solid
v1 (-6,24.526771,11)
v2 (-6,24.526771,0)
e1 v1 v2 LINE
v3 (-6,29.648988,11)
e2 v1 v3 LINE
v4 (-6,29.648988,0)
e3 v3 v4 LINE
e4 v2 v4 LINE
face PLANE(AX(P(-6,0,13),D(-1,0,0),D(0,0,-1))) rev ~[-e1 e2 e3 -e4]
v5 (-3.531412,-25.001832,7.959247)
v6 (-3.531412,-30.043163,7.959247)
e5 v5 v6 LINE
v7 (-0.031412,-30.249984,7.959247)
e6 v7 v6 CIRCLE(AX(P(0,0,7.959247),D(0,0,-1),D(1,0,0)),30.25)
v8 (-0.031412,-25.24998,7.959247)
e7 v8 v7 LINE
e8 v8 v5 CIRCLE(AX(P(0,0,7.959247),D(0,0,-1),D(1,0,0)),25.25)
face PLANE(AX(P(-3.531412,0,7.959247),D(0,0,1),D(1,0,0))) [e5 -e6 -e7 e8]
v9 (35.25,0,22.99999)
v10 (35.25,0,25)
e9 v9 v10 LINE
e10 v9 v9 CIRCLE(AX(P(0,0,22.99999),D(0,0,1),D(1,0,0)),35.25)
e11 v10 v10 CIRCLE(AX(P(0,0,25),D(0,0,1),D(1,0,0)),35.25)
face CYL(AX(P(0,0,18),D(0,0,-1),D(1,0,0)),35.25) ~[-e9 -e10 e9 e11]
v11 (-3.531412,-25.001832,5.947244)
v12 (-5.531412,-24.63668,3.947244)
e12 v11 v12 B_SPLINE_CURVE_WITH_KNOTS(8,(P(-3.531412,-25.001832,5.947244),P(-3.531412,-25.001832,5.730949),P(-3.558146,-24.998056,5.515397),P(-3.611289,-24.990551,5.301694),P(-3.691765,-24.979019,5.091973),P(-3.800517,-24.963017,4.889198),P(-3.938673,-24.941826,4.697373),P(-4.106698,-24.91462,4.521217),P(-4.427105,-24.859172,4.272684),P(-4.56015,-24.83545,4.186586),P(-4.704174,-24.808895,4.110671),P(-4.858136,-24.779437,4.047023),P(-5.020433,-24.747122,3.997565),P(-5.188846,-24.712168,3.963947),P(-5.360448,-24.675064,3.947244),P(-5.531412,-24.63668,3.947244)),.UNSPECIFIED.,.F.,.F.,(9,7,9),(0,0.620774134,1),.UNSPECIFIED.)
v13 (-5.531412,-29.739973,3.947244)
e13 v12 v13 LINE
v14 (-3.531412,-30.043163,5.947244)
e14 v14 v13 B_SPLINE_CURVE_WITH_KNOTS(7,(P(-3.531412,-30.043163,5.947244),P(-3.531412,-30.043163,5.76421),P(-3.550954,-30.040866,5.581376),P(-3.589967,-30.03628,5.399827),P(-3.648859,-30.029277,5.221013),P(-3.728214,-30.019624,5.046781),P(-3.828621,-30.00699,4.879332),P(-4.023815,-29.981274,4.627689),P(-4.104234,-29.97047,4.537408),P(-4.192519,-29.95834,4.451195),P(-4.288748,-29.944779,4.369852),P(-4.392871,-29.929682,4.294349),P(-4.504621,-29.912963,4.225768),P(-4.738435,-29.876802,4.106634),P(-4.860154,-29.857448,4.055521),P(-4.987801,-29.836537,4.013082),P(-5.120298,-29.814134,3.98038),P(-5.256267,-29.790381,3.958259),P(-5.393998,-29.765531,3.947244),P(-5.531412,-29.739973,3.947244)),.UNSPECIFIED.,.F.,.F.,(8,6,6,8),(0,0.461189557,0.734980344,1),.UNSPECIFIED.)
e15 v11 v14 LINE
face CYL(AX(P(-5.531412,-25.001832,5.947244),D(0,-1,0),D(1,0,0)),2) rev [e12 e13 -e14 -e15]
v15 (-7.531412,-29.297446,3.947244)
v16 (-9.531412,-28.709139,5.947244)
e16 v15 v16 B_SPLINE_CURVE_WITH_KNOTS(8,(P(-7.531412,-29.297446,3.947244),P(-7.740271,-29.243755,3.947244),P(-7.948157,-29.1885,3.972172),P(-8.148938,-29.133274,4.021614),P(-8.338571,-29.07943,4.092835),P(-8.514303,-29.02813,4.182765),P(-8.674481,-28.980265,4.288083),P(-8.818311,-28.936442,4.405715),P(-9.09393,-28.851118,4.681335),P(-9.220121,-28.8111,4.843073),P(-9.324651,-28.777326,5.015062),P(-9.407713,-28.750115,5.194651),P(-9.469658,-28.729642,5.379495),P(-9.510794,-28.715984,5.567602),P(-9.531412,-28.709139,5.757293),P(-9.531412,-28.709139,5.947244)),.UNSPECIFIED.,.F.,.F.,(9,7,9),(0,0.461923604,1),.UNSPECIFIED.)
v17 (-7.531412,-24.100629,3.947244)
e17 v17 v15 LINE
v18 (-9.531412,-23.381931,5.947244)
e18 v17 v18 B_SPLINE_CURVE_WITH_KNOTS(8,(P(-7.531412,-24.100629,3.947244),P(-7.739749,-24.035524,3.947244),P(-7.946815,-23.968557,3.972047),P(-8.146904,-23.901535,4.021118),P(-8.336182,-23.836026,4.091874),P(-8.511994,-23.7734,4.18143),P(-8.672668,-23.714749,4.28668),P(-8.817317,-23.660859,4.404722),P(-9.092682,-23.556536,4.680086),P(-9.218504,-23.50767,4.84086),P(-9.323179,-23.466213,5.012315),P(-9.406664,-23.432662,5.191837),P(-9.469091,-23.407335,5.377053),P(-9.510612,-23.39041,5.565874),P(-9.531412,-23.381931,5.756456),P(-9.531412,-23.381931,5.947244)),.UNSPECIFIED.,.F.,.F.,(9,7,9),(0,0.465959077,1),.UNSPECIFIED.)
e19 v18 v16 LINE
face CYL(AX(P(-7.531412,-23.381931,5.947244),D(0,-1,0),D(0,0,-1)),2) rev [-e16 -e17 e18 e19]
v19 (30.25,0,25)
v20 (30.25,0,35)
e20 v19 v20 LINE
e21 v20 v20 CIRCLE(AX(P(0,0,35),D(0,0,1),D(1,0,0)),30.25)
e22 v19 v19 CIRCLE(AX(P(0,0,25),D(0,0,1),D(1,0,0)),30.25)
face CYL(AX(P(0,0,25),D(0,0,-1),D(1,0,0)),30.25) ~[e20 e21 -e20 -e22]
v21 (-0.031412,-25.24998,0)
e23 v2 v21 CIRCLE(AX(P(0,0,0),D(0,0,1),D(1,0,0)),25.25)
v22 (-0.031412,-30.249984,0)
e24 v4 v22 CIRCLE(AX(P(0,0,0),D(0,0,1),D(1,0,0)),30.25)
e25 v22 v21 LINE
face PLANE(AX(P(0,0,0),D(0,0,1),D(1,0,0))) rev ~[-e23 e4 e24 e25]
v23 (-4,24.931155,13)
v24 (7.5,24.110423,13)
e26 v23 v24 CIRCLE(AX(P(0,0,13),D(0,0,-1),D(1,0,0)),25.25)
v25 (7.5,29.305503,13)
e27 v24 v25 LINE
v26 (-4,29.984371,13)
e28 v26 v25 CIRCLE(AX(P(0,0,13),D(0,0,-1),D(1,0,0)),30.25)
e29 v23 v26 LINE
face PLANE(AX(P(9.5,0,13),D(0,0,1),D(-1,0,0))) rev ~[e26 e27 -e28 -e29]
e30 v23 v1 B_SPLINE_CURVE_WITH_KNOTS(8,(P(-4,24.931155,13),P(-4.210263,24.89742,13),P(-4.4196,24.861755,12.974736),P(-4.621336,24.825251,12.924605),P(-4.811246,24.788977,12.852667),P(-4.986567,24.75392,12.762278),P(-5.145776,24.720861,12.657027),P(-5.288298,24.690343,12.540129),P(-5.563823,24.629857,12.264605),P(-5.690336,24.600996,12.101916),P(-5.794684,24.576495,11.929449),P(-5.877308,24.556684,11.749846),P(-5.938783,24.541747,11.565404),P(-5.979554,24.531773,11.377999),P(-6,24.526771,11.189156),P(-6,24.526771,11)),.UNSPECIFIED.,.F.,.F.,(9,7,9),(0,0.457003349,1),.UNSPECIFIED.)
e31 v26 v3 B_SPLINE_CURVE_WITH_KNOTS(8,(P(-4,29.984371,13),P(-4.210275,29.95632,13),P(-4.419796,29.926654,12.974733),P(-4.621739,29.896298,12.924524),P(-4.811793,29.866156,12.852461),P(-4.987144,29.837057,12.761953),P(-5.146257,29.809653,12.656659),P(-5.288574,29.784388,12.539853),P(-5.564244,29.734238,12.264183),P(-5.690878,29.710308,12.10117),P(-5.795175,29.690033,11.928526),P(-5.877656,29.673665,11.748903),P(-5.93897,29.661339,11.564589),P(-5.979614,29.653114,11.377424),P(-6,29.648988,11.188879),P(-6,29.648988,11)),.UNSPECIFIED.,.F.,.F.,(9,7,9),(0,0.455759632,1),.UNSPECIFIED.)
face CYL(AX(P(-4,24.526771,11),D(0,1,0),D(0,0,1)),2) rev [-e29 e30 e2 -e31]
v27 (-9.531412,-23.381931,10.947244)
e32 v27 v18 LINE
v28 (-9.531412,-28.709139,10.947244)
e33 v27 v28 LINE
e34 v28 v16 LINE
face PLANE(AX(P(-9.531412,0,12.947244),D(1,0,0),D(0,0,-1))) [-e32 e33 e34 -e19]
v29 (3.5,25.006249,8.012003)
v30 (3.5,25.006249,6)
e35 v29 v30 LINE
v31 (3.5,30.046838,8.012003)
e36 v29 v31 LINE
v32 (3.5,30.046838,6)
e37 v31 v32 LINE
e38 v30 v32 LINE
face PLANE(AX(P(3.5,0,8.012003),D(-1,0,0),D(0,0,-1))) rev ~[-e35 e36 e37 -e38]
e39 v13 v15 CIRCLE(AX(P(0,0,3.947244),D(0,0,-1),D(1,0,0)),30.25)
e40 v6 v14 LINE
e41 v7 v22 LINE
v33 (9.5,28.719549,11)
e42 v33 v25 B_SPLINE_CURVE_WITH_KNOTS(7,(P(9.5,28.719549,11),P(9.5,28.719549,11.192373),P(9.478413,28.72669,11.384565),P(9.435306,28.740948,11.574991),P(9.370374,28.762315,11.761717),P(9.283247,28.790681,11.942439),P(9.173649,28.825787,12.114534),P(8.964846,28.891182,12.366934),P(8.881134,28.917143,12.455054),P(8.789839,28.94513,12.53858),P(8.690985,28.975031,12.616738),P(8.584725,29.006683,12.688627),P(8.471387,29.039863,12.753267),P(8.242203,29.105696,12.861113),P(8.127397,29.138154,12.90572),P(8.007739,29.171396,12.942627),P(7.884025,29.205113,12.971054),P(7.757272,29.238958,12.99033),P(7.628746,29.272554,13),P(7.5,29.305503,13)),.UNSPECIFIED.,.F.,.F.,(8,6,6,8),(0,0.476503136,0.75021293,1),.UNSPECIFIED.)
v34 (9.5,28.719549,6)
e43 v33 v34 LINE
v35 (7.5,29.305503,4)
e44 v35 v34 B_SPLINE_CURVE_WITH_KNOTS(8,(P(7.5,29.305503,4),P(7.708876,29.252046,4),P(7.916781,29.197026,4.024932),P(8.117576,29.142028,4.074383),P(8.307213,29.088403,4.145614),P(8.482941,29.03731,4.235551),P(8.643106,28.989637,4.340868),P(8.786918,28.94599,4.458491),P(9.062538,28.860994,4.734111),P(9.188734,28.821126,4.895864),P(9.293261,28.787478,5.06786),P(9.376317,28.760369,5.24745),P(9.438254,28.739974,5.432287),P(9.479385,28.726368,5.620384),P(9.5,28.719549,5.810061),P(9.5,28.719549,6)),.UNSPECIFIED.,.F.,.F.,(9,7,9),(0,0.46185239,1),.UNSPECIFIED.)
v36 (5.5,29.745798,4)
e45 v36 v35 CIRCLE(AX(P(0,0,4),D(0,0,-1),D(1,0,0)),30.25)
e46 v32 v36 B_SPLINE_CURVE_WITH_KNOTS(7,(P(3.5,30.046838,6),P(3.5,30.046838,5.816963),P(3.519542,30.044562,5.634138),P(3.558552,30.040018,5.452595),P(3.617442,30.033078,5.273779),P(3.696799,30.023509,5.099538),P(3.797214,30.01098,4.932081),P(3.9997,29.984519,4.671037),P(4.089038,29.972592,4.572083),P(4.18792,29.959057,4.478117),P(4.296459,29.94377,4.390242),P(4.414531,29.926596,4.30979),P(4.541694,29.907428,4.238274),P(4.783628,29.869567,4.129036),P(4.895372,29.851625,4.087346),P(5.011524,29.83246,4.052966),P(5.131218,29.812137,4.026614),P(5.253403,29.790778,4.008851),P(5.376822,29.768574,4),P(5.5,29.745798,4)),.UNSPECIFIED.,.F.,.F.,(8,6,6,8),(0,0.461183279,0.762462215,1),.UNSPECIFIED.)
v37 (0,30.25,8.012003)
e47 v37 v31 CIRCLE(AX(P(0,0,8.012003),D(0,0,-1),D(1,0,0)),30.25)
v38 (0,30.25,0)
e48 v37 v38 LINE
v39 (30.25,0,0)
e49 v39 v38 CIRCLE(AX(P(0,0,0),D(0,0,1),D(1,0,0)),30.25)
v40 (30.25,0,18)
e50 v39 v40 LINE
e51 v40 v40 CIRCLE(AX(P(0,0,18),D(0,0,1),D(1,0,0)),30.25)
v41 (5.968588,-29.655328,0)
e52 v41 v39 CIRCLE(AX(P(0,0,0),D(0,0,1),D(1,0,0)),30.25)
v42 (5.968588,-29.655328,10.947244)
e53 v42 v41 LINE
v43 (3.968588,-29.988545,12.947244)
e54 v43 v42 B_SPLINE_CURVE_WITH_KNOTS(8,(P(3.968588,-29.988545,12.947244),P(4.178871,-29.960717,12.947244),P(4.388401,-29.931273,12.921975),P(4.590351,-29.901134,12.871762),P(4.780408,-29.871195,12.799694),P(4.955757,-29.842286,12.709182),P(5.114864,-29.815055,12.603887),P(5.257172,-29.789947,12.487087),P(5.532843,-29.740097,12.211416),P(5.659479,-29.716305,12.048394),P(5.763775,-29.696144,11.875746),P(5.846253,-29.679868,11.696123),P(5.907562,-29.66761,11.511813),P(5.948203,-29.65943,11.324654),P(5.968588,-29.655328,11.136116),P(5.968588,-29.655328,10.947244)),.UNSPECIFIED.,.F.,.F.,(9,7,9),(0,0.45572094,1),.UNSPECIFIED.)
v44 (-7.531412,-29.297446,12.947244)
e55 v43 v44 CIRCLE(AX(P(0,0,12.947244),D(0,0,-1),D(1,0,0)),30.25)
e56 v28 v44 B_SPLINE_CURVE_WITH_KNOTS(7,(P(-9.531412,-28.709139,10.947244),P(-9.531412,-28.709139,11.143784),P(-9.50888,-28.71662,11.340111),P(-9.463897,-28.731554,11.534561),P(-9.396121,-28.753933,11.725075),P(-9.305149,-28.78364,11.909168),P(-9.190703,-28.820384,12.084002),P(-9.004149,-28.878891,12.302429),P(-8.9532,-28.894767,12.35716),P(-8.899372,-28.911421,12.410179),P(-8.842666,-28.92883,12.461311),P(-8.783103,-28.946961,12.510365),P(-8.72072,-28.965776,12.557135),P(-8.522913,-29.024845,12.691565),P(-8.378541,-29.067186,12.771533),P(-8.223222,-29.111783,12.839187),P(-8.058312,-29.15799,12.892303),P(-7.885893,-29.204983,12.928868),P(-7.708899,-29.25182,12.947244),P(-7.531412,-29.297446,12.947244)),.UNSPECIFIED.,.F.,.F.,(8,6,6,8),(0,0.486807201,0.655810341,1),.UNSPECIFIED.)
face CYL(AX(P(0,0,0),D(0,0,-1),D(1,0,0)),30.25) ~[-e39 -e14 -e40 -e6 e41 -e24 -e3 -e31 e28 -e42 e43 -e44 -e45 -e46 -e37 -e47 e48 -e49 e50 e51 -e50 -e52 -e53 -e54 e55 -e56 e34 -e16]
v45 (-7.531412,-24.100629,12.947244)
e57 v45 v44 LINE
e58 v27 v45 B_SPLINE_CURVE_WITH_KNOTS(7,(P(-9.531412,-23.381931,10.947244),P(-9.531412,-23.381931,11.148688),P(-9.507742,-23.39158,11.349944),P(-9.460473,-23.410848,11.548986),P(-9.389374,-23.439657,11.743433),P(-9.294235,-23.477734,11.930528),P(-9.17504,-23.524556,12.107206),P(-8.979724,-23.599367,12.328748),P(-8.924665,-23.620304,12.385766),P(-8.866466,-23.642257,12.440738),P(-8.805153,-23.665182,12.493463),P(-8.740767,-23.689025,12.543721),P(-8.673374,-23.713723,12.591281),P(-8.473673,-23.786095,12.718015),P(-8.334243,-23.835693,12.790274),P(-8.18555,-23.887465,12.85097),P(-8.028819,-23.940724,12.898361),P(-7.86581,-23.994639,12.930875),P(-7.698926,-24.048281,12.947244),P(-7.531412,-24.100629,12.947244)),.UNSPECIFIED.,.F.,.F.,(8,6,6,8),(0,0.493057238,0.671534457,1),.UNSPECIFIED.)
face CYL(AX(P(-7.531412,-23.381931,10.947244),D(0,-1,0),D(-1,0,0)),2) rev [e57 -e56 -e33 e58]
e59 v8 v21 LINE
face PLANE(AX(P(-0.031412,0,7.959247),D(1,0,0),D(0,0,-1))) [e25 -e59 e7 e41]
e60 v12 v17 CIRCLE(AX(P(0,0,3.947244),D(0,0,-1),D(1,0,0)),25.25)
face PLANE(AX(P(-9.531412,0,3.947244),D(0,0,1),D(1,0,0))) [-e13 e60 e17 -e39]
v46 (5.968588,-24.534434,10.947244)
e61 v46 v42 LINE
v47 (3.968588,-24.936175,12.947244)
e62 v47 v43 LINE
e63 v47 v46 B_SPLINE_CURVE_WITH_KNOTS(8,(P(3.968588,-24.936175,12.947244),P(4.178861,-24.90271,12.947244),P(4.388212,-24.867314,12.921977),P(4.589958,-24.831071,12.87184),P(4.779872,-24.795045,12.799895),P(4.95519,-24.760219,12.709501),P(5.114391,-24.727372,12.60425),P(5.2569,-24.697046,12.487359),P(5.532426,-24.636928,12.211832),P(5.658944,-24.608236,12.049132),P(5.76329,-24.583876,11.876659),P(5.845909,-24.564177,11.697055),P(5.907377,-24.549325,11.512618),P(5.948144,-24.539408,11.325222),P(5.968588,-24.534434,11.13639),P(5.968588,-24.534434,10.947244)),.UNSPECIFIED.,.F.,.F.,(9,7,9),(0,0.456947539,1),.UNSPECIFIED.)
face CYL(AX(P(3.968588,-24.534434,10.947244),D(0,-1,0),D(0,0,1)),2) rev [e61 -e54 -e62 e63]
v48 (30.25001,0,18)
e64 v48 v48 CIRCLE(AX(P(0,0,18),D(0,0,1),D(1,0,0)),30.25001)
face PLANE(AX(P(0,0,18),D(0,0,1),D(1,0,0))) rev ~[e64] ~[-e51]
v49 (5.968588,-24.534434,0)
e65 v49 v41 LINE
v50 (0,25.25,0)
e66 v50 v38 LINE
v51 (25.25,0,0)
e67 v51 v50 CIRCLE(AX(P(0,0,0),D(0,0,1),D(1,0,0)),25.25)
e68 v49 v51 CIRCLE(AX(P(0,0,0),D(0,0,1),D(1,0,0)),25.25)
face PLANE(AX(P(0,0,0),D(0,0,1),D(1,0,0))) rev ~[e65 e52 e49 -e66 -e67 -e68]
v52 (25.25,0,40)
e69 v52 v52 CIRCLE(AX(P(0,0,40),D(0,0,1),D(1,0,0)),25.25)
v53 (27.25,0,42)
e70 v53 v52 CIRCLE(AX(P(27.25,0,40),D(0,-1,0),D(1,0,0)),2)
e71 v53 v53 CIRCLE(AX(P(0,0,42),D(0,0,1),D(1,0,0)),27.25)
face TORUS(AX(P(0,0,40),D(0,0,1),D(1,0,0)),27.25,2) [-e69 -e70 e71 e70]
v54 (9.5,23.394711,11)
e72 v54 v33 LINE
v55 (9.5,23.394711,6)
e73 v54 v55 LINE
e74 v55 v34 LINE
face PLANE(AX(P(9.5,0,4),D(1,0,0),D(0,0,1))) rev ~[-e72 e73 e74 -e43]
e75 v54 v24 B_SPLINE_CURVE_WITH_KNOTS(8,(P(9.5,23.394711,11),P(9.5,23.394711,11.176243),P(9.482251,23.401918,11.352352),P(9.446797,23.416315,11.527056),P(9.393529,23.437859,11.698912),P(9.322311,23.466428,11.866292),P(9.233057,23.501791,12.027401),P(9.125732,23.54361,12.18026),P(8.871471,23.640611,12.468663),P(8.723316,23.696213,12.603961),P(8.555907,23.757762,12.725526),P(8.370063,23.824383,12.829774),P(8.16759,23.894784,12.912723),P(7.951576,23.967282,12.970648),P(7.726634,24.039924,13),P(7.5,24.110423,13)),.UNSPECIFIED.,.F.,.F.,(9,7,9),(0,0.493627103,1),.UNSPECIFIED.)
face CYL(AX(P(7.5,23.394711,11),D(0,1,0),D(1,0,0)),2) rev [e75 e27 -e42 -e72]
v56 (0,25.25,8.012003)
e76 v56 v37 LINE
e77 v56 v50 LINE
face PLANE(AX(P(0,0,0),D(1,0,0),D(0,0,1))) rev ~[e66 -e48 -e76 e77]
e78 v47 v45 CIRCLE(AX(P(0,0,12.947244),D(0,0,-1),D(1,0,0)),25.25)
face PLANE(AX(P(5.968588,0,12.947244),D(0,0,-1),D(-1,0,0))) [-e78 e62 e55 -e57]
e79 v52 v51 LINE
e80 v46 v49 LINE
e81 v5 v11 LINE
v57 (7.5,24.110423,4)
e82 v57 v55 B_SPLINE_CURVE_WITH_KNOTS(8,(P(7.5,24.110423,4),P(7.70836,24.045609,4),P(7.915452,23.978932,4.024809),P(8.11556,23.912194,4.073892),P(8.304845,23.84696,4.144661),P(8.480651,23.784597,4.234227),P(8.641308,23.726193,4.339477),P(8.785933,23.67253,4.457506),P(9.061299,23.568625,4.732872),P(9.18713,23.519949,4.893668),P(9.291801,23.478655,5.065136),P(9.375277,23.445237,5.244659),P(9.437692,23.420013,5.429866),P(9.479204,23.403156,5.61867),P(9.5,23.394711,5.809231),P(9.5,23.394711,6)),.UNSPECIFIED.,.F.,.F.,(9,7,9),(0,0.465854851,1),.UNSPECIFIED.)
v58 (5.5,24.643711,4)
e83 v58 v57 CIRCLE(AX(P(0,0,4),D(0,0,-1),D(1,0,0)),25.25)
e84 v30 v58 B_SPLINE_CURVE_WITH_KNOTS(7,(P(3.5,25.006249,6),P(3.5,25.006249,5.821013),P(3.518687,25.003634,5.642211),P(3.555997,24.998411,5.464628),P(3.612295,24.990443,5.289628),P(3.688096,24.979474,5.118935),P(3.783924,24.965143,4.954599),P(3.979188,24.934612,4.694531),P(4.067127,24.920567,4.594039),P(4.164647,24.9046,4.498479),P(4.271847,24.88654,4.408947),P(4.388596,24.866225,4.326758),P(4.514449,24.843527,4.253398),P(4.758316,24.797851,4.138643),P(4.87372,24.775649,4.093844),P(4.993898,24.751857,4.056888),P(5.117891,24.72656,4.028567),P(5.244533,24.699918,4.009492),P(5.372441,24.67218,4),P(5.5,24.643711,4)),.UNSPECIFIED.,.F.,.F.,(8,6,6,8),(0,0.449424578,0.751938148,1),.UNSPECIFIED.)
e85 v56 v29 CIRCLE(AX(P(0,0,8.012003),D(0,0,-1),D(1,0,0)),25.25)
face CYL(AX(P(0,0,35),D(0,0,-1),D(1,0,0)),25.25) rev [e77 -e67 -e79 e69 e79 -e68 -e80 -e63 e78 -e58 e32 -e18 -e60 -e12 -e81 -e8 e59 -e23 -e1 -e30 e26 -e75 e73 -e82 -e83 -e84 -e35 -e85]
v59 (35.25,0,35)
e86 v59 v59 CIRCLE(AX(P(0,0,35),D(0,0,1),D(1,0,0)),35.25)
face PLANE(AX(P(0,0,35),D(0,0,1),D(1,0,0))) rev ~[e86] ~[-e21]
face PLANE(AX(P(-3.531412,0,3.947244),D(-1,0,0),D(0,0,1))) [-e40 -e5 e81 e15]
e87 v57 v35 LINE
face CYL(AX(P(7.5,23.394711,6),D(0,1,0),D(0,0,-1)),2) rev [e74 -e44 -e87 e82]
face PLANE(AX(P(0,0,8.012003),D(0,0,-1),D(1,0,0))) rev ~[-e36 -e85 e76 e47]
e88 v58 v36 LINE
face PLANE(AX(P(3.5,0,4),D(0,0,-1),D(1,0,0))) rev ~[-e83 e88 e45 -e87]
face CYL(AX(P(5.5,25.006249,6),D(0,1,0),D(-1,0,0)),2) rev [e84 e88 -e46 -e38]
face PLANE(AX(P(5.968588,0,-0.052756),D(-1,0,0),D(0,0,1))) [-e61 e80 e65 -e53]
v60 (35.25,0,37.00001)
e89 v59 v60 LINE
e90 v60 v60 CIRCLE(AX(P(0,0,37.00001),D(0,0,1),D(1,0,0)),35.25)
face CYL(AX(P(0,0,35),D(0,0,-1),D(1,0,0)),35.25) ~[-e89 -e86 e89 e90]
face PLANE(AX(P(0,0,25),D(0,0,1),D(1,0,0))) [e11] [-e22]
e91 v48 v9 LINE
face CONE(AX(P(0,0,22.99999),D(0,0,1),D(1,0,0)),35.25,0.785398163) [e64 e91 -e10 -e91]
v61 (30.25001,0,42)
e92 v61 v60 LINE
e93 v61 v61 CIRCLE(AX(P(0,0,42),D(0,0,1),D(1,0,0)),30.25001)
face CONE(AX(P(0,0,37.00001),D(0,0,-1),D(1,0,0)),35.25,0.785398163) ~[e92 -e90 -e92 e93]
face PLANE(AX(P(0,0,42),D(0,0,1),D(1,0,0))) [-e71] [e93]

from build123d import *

# Parameters (mm, degrees)
F0_R      = 30.25
F0_R_2    = 25.25
F1_DEPTH  = 18
F2_R      = 35.25
F2_R_2    = 30.25
F2_R_3    = 25.25
F3_DEPTH  = 7
F4_R      = 30.25
F4_R_2    = 25.25
F5_DEPTH  = 10
F6_R      = 35.25
F6_R_2    = 30.25
F6_R_3    = 25.25
F7_DEPTH  = 7
F8_R      = 2
F10_DEPTH = 50
F11_R     = 2
F13_DEPTH = 50
F14_R     = 2
F15_SIZE2 = 4.99999
F15_SIZE  = 4.99999


# Not quite as in the source:
# - a fillet or chamfer is up to 0.001 mm smaller than in the source, because OpenCascade refuses the exact size


with BuildPart() as f1:
    # F0 (on Top) → F1 (new body)
    with BuildSketch(Plane.XY):
        Circle(F0_R)
        Circle(F0_R_2, mode=Mode.SUBTRACT)
    extrude(amount=F1_DEPTH)

    # F2 (on face) → F3 (join)
    with BuildSketch(Plane.XY.offset(18)):
        Circle(F2_R)
        Circle(F2_R_2, mode=Mode.SUBTRACT)
        Circle(F2_R_2)
        Circle(F2_R_3, mode=Mode.SUBTRACT)
    extrude(amount=F3_DEPTH)

    # F4 (on face) → F5 (join)
    with BuildSketch(Plane.XY.offset(25)):
        Circle(F4_R)
        Circle(F4_R_2, mode=Mode.SUBTRACT)
    extrude(amount=F5_DEPTH)

    # F6 (on face) → F7 (join)
    with BuildSketch(Plane.XY.offset(35)):
        Circle(F6_R)
        Circle(F6_R_2, mode=Mode.SUBTRACT)
        Circle(F6_R_2)
        Circle(F6_R_3, mode=Mode.SUBTRACT)
    extrude(amount=F7_DEPTH)

    # F8
    f8_edges = [f1.edges().sort_by_distance(p)[0] for p in [
        (-25.25, 0, 42),
    ]]
    fillet(f8_edges, radius=F8_R)

    # F9 (on Front) → F10 (cut)
    with BuildSketch(Plane.XZ):
        Polygon((-6, 0), (0, 0), (0, 8.0120034479), (3.5, 8.0120034479), (3.5, 4), (9.5, 4), (9.5, 13), (-6, 13), align=None)
    extrude(amount=-F10_DEPTH, mode=Mode.SUBTRACT)

    # F11
    f11_edges = [f1.edges().sort_by_distance(p)[0] for p in [
        (9.5, 26.05713, 13),
        (-6, 27.08788, 13),
        (3.5, 27.526544, 4),
        (9.5, 26.05713, 4),
    ]]
    fillet(f11_edges, radius=F11_R)

    # F12 (on Front) → F13 (cut)
    with BuildSketch(Plane.XZ):
        Polygon((-0.0314122736, -0.0527559742), (5.9685877264, -0.0527559742), (5.9685877264, 12.9472440258), (-9.5314122736, 12.9472440258), (-9.5314122736, 3.9472440258), (-3.5314122736, 3.9472440258), (-3.5314122736, 7.9592474737), (-0.0314122736, 7.9592474737), align=None)
    extrude(amount=F13_DEPTH, mode=Mode.SUBTRACT)

    # F14
    f14_edges = [f1.edges().sort_by_distance(p)[0] for p in [
        (-9.531412, -26.045535, 12.947244),
        (-9.531412, -26.045535, 3.947244),
        (-3.531412, -27.522498, 3.947244),
        (5.968588, -27.094881, 12.947244),
    ]]
    fillet(f14_edges, radius=F14_R)

    # F15 (size 5 and 5 in the source; OpenCascade refuses exactly that, so slightly less here)
    f15_edges = [f1.edges().sort_by_distance(p)[0] for p in [
        (-35.25, 0, 18),
        (-35.25, 0, 42),
    ]]
    chamfer(f15_edges, length=F15_SIZE, length2=F15_SIZE2)


solid = f1.part
